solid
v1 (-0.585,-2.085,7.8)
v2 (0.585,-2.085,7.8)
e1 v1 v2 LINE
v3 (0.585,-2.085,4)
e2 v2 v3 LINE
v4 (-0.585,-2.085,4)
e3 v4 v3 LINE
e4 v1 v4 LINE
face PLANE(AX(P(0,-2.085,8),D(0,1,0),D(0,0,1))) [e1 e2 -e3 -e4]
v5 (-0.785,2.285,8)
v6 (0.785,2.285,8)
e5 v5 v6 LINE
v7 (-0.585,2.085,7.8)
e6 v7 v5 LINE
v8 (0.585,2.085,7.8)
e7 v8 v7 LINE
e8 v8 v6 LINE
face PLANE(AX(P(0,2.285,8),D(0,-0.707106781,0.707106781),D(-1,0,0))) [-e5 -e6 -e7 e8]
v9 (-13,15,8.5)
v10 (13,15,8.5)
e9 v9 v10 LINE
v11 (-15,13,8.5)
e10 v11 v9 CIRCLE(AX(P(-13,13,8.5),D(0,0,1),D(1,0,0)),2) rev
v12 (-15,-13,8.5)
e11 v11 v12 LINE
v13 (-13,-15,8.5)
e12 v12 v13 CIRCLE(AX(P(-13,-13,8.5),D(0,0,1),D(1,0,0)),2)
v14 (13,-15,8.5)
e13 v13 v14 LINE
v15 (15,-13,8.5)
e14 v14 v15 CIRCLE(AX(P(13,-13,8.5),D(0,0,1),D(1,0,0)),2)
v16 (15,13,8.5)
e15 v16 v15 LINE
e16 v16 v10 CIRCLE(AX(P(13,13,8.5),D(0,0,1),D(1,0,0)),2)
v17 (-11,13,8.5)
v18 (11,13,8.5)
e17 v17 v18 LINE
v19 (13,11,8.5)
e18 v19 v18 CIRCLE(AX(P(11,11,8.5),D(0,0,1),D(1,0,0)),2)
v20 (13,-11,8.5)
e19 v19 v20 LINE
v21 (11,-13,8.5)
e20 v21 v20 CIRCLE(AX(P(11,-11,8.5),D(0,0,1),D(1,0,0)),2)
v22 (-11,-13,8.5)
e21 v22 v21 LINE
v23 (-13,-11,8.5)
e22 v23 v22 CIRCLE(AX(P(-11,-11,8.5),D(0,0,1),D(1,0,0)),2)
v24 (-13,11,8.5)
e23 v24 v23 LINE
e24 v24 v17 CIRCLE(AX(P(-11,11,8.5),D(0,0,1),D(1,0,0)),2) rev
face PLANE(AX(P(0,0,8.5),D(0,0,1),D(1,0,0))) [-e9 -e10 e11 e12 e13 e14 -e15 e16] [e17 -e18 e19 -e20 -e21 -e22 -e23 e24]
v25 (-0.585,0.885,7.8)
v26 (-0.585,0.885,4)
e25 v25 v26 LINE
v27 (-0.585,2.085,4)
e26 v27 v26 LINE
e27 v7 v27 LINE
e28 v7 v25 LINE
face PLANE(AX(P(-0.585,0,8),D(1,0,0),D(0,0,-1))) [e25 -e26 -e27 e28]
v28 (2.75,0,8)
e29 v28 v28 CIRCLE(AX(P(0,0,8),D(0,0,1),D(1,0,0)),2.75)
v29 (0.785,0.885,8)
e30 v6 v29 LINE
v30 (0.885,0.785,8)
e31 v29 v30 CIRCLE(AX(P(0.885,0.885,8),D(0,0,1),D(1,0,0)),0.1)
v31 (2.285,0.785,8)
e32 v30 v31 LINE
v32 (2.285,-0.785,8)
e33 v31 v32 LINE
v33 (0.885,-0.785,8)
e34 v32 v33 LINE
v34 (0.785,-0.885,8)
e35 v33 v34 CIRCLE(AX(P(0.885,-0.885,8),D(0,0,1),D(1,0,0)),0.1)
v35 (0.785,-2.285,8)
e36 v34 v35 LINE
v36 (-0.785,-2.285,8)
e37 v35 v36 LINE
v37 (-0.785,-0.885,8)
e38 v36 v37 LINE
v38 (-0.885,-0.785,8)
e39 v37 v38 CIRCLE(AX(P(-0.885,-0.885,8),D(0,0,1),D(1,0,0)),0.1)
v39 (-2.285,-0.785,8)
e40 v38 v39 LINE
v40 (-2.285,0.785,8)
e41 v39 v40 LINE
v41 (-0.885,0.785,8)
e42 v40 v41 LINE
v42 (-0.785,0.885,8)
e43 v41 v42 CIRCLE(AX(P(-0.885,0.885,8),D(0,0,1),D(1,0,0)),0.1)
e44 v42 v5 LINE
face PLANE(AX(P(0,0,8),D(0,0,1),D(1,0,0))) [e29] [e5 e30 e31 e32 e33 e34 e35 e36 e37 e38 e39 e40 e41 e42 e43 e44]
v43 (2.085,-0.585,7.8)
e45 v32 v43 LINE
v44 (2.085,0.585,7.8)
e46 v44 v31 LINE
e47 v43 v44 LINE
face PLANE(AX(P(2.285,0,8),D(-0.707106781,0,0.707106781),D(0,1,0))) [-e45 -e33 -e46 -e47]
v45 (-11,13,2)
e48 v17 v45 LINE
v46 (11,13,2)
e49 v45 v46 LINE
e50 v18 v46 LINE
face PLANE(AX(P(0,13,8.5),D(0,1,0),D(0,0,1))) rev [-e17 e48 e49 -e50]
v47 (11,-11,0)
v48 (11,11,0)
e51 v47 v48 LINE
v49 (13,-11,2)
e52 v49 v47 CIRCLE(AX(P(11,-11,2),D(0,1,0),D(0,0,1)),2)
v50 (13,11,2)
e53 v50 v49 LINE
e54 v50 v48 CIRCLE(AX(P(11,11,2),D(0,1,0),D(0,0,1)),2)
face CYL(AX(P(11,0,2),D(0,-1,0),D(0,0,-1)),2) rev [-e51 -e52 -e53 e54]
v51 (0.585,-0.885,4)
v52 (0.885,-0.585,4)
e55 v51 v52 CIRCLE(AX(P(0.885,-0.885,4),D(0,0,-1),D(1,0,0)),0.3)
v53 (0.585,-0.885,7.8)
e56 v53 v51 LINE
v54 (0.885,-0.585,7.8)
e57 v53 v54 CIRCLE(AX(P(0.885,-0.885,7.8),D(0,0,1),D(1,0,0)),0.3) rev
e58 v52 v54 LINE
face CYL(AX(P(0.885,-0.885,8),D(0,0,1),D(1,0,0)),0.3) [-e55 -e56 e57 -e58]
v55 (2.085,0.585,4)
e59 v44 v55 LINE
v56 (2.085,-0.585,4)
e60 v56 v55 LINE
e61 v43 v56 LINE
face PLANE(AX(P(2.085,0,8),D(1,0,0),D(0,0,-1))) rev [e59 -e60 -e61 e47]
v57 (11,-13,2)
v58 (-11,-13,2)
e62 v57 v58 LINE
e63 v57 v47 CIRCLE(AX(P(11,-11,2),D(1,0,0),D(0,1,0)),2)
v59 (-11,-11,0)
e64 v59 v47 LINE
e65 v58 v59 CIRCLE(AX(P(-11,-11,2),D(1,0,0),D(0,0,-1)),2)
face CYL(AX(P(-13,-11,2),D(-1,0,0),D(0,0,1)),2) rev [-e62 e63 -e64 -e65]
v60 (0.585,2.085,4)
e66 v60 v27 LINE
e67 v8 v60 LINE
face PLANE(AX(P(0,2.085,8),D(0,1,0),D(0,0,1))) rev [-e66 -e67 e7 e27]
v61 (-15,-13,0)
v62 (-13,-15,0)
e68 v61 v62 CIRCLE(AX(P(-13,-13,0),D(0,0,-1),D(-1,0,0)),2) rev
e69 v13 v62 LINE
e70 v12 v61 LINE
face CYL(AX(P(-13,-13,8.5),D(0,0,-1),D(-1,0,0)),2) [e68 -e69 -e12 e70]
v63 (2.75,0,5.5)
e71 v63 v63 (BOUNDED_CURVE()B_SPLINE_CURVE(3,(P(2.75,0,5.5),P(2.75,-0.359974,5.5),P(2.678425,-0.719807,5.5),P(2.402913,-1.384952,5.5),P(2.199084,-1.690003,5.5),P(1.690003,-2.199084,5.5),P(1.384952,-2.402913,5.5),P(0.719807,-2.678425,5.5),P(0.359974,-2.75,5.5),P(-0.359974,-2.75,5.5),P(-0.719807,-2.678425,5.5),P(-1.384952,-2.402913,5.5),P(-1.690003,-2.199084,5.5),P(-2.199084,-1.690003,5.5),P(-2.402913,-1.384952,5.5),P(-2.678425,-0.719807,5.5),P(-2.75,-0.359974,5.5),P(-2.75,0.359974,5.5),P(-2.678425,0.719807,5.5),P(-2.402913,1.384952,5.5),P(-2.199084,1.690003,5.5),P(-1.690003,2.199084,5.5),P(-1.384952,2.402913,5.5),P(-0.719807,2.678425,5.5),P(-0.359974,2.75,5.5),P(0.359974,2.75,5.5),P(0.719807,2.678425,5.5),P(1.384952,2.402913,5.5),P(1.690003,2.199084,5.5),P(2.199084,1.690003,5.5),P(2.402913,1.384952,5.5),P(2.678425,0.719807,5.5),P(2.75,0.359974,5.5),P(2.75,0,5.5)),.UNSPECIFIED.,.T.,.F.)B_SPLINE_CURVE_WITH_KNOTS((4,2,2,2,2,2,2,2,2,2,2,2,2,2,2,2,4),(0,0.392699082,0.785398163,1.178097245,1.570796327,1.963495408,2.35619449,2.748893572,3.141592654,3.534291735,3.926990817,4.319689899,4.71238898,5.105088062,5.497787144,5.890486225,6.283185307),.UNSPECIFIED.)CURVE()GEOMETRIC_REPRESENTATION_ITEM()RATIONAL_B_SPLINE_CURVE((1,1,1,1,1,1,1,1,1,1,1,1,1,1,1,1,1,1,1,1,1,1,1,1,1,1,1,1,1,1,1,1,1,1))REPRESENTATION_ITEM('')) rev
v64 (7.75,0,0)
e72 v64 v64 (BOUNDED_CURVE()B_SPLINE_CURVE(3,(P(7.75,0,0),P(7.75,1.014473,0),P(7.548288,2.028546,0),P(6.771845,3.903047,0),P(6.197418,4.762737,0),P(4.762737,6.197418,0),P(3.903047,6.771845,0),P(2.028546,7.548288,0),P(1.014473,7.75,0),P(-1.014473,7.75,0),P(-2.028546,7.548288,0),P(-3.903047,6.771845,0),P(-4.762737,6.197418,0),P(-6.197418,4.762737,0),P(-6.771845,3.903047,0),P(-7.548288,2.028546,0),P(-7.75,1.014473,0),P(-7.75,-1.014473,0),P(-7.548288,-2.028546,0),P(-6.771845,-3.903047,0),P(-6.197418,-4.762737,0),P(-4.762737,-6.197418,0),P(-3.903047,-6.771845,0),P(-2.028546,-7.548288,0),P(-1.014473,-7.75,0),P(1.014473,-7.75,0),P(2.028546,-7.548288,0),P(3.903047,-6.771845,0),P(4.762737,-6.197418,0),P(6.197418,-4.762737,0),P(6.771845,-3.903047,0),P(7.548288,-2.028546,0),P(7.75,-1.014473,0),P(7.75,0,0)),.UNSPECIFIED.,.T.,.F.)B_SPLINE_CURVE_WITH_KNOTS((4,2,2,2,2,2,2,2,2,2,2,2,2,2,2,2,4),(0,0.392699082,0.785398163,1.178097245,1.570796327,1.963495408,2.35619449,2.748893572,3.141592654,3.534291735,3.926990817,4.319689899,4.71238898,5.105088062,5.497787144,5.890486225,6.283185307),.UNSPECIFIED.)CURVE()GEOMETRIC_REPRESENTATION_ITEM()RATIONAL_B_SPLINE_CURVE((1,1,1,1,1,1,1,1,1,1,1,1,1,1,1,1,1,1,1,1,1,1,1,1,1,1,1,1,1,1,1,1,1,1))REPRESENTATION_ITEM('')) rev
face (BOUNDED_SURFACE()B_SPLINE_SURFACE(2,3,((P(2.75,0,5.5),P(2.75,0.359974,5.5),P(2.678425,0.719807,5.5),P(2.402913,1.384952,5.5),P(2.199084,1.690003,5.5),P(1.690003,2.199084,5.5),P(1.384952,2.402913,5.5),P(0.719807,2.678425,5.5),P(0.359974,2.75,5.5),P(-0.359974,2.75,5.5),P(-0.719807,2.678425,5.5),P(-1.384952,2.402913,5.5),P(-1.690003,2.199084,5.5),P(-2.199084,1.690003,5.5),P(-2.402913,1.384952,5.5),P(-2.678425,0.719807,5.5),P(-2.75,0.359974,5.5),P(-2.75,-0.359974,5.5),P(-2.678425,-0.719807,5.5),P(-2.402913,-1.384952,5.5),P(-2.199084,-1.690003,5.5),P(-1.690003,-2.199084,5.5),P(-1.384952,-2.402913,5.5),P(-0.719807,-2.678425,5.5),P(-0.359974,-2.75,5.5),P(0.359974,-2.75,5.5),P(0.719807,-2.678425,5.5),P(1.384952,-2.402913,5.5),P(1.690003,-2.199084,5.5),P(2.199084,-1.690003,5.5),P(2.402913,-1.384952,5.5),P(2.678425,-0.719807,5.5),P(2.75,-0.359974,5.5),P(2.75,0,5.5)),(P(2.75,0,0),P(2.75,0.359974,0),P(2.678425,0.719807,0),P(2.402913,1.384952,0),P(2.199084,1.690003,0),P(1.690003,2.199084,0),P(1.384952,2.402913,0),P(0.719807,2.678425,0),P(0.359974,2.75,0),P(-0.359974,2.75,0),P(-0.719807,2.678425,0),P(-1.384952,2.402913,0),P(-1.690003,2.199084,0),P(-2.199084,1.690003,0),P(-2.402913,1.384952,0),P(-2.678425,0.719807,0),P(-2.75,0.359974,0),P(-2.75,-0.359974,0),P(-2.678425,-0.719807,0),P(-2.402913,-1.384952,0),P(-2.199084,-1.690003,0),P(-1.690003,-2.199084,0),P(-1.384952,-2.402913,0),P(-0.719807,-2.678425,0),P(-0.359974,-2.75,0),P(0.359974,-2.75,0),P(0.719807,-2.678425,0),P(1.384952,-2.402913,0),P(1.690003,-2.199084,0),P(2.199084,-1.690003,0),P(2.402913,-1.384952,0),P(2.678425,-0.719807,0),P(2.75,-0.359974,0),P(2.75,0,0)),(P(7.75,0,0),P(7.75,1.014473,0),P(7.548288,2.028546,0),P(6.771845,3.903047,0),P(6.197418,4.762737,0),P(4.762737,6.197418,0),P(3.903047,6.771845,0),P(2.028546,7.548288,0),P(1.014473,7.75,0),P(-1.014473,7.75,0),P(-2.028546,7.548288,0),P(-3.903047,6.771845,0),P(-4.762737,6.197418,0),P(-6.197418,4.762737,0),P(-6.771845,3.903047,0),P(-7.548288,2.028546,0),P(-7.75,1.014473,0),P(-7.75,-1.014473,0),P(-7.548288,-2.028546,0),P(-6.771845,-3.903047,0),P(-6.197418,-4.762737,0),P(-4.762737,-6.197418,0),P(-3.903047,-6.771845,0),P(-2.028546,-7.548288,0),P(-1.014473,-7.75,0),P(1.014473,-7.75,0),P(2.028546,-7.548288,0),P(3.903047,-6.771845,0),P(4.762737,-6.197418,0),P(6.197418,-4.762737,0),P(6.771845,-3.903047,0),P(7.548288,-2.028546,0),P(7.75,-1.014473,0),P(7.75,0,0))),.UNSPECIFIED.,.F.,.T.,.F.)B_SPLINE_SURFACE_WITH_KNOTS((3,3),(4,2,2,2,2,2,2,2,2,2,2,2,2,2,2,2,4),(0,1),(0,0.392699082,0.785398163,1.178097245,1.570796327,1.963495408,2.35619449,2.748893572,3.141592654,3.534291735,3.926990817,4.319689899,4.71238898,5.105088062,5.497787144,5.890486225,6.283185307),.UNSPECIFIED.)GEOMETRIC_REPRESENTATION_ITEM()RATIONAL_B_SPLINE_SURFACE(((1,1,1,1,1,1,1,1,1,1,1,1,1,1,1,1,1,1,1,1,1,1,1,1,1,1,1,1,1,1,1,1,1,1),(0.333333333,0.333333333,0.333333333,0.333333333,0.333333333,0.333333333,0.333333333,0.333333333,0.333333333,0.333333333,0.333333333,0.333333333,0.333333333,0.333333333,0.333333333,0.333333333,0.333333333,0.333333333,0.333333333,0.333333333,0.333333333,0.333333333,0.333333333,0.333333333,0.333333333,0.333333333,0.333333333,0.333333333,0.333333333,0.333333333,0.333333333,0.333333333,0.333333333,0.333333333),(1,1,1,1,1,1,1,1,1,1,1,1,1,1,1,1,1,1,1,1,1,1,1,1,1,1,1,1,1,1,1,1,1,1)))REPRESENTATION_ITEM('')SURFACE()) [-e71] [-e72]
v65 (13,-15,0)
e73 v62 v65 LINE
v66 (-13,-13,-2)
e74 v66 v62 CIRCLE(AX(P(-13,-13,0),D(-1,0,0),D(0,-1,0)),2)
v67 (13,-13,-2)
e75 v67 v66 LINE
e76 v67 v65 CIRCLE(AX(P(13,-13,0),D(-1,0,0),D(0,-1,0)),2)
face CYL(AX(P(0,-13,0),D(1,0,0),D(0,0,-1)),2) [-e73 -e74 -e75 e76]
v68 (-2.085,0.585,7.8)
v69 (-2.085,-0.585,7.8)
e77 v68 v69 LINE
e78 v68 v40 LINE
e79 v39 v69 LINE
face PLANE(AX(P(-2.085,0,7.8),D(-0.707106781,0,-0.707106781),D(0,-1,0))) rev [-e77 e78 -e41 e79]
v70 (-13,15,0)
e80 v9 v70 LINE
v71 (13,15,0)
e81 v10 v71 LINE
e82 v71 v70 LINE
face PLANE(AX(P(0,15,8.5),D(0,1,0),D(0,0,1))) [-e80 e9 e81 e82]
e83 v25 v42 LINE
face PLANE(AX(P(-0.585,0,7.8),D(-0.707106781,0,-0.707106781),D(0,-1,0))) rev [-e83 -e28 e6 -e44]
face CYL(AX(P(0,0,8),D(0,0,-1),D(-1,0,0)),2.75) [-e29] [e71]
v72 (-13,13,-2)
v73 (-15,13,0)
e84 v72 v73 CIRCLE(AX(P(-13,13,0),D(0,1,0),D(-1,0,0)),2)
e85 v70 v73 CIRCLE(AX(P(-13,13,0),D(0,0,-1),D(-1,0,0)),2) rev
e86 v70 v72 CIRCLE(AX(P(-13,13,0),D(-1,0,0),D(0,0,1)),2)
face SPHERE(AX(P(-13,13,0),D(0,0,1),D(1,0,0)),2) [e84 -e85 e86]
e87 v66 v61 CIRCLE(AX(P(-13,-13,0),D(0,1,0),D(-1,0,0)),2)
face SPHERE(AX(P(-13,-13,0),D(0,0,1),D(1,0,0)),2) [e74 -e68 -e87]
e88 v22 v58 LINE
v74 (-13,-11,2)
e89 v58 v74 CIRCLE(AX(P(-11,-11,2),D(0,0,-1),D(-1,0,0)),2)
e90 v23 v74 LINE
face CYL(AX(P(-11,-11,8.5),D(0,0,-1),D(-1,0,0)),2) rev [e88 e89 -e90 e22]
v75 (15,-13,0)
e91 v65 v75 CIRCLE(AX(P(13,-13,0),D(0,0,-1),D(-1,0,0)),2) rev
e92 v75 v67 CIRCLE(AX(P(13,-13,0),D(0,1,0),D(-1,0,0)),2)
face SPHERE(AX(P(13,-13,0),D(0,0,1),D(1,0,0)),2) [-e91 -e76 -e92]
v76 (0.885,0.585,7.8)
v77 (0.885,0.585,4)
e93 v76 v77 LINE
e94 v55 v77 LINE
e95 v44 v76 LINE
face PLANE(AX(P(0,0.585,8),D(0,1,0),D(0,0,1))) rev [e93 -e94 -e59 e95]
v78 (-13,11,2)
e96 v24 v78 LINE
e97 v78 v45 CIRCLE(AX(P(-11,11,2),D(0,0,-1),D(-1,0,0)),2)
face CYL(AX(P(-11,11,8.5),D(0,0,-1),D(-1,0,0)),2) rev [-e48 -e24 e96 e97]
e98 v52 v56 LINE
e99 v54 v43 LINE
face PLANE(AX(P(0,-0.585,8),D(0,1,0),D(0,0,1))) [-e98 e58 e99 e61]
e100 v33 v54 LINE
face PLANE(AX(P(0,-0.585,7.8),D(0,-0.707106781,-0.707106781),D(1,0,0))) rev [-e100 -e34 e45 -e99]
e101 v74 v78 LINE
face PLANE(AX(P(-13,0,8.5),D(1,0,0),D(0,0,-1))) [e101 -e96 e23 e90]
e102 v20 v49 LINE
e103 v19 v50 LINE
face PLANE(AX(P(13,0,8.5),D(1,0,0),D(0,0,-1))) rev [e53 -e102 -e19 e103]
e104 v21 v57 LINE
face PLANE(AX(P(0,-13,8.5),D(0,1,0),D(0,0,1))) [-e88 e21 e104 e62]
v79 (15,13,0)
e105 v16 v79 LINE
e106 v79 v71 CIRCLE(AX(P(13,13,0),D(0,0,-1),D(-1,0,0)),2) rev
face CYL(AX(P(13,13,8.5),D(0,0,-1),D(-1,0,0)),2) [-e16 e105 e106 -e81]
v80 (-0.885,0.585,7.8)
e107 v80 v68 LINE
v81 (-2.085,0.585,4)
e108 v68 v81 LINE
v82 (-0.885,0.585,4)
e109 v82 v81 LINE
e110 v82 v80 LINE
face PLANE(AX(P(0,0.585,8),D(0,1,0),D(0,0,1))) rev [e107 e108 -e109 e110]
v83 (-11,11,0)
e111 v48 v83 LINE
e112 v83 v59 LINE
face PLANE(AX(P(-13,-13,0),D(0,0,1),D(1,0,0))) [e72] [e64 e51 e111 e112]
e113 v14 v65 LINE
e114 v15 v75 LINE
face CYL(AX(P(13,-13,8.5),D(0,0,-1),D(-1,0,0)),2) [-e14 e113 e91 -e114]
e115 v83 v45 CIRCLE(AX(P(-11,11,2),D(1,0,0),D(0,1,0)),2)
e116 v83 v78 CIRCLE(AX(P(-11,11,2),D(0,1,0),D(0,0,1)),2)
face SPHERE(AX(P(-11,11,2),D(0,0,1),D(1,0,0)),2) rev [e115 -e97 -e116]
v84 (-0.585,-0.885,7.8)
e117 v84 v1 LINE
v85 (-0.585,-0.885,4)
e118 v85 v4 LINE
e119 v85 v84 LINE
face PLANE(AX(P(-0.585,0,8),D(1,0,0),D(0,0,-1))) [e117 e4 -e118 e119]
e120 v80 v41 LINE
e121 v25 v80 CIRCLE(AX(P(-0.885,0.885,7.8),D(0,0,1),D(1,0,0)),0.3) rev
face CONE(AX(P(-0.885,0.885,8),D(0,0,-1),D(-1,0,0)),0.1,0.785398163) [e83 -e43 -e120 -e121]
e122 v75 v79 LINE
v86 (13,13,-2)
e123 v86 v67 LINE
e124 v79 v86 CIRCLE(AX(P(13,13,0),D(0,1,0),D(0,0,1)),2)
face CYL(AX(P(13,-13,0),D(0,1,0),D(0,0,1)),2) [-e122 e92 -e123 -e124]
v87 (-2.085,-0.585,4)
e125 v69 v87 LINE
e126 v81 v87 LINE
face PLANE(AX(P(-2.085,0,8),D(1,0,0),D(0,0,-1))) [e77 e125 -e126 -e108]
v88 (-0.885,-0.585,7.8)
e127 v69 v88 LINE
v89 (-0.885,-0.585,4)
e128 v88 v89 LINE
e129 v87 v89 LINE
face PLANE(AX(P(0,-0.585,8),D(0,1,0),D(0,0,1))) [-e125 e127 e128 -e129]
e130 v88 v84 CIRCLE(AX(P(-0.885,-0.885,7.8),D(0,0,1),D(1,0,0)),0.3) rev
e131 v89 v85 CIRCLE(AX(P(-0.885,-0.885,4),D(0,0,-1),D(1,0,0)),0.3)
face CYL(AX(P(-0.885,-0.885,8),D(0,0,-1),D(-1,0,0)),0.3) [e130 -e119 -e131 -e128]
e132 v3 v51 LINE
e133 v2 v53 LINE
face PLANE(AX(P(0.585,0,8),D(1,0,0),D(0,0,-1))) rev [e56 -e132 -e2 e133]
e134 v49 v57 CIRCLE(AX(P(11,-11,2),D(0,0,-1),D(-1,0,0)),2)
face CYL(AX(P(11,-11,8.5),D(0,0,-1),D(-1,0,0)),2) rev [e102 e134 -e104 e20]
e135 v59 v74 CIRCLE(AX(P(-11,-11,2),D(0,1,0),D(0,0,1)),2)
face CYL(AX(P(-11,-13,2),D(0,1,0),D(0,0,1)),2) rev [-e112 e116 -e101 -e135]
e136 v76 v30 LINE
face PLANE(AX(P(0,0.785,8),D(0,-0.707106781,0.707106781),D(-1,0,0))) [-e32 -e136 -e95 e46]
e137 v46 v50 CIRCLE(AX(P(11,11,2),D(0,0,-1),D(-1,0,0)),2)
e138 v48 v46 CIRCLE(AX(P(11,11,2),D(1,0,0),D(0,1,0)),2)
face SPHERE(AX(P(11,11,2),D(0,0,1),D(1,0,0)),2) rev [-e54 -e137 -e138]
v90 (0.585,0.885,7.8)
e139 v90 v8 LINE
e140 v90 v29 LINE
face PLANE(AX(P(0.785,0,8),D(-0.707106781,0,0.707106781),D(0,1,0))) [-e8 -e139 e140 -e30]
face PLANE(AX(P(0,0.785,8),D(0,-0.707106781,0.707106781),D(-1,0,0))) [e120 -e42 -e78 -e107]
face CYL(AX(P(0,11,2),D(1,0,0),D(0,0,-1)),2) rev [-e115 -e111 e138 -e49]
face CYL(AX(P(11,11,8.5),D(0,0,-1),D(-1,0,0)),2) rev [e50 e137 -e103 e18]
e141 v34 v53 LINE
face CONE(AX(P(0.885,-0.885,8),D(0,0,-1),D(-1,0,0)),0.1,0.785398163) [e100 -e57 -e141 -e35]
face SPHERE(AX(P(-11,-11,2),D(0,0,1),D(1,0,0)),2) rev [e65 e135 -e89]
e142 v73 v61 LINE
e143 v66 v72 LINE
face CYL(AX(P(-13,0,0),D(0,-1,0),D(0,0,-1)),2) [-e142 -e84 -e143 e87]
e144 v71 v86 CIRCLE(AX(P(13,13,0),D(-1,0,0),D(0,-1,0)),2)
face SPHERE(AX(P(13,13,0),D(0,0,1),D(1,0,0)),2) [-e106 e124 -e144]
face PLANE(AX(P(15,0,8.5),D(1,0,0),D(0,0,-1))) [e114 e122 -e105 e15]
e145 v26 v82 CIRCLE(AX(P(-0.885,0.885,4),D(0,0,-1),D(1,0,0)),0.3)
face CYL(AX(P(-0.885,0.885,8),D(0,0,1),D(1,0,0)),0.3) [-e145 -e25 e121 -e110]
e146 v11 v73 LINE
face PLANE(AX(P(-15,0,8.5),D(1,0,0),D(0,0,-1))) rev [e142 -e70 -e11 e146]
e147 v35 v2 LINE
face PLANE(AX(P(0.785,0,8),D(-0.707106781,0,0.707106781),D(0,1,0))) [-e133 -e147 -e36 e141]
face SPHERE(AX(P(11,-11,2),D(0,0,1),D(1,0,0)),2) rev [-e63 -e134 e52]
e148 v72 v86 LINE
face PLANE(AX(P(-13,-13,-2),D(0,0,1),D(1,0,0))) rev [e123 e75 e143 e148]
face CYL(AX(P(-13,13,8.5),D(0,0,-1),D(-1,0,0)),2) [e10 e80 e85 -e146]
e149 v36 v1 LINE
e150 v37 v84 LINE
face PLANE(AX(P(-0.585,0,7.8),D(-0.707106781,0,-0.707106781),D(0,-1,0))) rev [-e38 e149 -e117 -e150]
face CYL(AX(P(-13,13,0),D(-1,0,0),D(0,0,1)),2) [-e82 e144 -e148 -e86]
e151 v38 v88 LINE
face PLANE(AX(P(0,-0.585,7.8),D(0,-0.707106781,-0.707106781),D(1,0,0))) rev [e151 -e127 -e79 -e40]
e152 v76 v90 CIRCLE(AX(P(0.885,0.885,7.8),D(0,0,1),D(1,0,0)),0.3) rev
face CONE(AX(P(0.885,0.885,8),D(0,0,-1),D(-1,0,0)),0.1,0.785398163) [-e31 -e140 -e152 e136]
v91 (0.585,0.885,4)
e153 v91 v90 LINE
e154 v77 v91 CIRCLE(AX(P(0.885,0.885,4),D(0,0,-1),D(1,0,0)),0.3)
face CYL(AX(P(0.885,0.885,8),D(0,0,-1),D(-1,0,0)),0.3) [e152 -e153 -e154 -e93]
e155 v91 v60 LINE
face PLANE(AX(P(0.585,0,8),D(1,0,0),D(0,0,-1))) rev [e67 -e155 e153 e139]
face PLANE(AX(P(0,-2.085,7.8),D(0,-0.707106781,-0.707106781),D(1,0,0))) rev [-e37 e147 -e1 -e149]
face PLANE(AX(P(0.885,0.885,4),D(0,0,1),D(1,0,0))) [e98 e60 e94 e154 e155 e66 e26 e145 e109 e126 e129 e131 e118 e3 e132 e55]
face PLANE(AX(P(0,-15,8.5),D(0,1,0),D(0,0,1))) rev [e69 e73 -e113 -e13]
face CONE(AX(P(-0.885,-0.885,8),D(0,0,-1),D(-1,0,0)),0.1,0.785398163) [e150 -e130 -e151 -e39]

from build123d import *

# Parameters (mm, degrees)
EXTRUDE_1_DEPTH = 8.5
SKETCH_1_6_R    = 2.75
EXTRUDE_2_DEPTH = 8
EXTRUDE_START   = -2
EXTRUDE_3_DEPTH = 2
FILLET_4_R      = 0.3
FILLET_1_R      = 2
CHAMFER_1_SIZE  = 0.2
FILLET_2_R      = 2
FILLET_3_SIZE   = 5
FILLET_3_SIZE_2 = 5.5
EXTRUDE_START_2 = 4
EXTRUDE_4_DEPTH = 4


with BuildPart() as part:
    # 草图1 → 凸台-拉伸1 (new body)
    with BuildSketch(Plane.XY):
        with BuildLine():
            ThreePointArc((-15, 13), (-14.414213562, 14.414213562), (-13, 15))
            Line((-13, 15), (13, 15))
            ThreePointArc((13, 15), (14.414213562, 14.414213562), (15, 13))
            Line((15, 13), (15, -13))
            ThreePointArc((15, -13), (14.414213562, -14.414213562), (13, -15))
            Line((13, -15), (-13, -15))
            ThreePointArc((-13, -15), (-14.414213562, -14.414213562), (-15, -13))
            Line((-15, -13), (-15, 13))
        make_face()
        with BuildLine():
            ThreePointArc((-13, -11), (-12.414213562, -12.414213562), (-11, -13))
            Line((-11, -13), (11, -13))
            ThreePointArc((11, -13), (12.414213562, -12.414213562), (13, -11))
            Line((13, -11), (13, 11))
            ThreePointArc((13, 11), (12.414213562, 12.414213562), (11, 13))
            Line((11, 13), (-11, 13))
            ThreePointArc((-11, 13), (-12.414213562, 12.414213562), (-13, 11))
            Line((-13, 11), (-13, -11))
        make_face(mode=Mode.SUBTRACT)
    extrude(amount=EXTRUDE_1_DEPTH)



with BuildPart() as body_2:
    # 草图1<6> → 凸台-拉伸2 (new body)
    with BuildSketch(Plane.XY):
        Circle(SKETCH_1_6_R)
        Polygon((-2.085, -0.585), (-2.085, 0.585), (-0.585, 0.585), (-0.585, 2.085), (0.585, 2.085), (0.585, 0.585), (2.085, 0.585), (2.085, -0.585), (0.585, -0.585), (0.585, -2.085), (-0.585, -2.085), (-0.585, -0.585), align=None, mode=Mode.SUBTRACT)
    extrude(amount=EXTRUDE_2_DEPTH)


with BuildPart() as part_1:
    add(part.part)

    add(body_2.part)  # 凸台-拉伸3 merges body 2
    # 草图1<7> → 凸台-拉伸3 (add)
    with BuildSketch(Plane.XY.offset(EXTRUDE_START)):
        with BuildLine():
            Line((-13, 15), (13, 15))
            ThreePointArc((13, 15), (14.414213562, 14.414213562), (15, 13))
            Line((15, 13), (15, -13))
            ThreePointArc((15, -13), (14.414213562, -14.414213562), (13, -15))
            Line((13, -15), (-13, -15))
            ThreePointArc((-13, -15), (-14.414213562, -14.414213562), (-15, -13))
            Line((-15, -13), (-15, 13))
            ThreePointArc((-15, 13), (-14.414213562, 14.414213562), (-13, 15))
        make_face()
    extrude(amount=EXTRUDE_3_DEPTH)

    # 圆角4
    fillet_4_edges = [part_1.edges().sort_by_distance(p)[0] for p in [
        (0.585, 0.585, 4),
        (0.585, -0.585, 4),
        (-0.585, -0.585, 4),
        (-0.585, 0.585, 4),
    ]]
    fillet(fillet_4_edges, radius=FILLET_4_R)

    # 圆角1
    fillet_1_edges = [part_1.edges().sort_by_distance(p)[0] for p in [
        (-14.414213562, -14.414213562, -2),
        (-15, 0, -2),
        (14.414213562, 14.414213562, -2),
        (14.414213562, -14.414213562, -2),
        (0, -15, -2),
        (-14.414213562, 14.414213562, -2),
        (0, 15, -2),
        (15, 0, -2),
    ]]
    fillet(fillet_1_edges, radius=FILLET_1_R)

    # 倒角1
    chamfer_1_edges = [part_1.edges().sort_by_distance(p)[0] for p in [
        (1.485, 0.585, 8),
        (1.485, -0.585, 8),
        (0.585, -1.485, 8),
        (-0.585, -1.485, 8),
        (0.672867966, -0.672867966, 8),
        (-0.672867966, -0.672867966, 8),
        (0.672867966, 0.672867966, 8),
        (-0.672867966, 0.672867966, 8),
        (0, -2.085, 8),
        (-1.485, -0.585, 8),
        (-2.085, 0, 8),
        (-0.585, 1.485, 8),
        (0, 2.085, 8),
        (0.585, 1.485, 8),
        (2.085, 0, 8),
        (-1.485, 0.585, 8),
    ]]
    chamfer(chamfer_1_edges, length=CHAMFER_1_SIZE)

    # 圆角2
    fillet_2_edges = [part_1.edges().sort_by_distance(p)[0] for p in [
        (0, -13, 0),
        (12.414213562, -12.414213562, 0),
        (13, 0, 0),
        (12.414213562, 12.414213562, 0),
        (0, 13, 0),
        (-12.414213562, 12.414213562, 0),
        (-13, 0, 0),
        (-12.414213562, -12.414213562, 0),
    ]]
    fillet(fillet_2_edges, radius=FILLET_2_R)

    # 圆角3
    # a fillet whose section is not a circle: 5.5, 5 mm, written as the material it adds along each edge
    with BuildSketch(Plane(origin=(0, 0, 0), x_dir=(1, 0, 0), z_dir=(0, -1, 0))) as fillet_3_piece_1:
        with BuildLine():
            Bezier((2.75 + FILLET_3_SIZE, 0), (2.75, 0), (2.75, FILLET_3_SIZE_2), weights=[1, 0.333333333, 1])
            Line((2.75, FILLET_3_SIZE_2), (2.75, 0))
            Line((2.75, 0), (2.75 + FILLET_3_SIZE, 0))
        make_face()
    revolve(axis=Axis((0, 0, 0), (0, 0, 1)))

    # 草图3 → 凸台-拉伸4 (add)
    with BuildSketch(Plane.XY.offset(EXTRUDE_START_2)):
        with BuildLine():
            Line((0.585, 0.885), (0.585, 2.085))
            Line((0.585, 2.085), (-0.585, 2.085))
            Line((-0.585, 2.085), (-0.585, 0.885))
            ThreePointArc((-0.585, 0.885), (-0.672867966, 0.672867966), (-0.885, 0.585))
            Line((-0.885, 0.585), (-2.085, 0.585))
            Line((-2.085, 0.585), (-2.085, -0.585))
            Line((-2.085, -0.585), (-0.885, -0.585))
            ThreePointArc((-0.885, -0.585), (-0.672867966, -0.672867966), (-0.585, -0.885))
            Line((-0.585, -0.885), (-0.585, -2.085))
            Line((-0.585, -2.085), (0.585, -2.085))
            Line((0.585, -2.085), (0.585, -0.885))
            ThreePointArc((0.585, -0.885), (0.672867966, -0.672867966), (0.885, -0.585))
            Line((0.885, -0.585), (2.085, -0.585))
            Line((2.085, -0.585), (2.085, 0.585))
            Line((2.085, 0.585), (0.885, 0.585))
            ThreePointArc((0.885, 0.585), (0.672867966, 0.672867966), (0.585, 0.885))
        make_face()
    extrude(amount=-EXTRUDE_4_DEPTH)


solid = part_1.part
